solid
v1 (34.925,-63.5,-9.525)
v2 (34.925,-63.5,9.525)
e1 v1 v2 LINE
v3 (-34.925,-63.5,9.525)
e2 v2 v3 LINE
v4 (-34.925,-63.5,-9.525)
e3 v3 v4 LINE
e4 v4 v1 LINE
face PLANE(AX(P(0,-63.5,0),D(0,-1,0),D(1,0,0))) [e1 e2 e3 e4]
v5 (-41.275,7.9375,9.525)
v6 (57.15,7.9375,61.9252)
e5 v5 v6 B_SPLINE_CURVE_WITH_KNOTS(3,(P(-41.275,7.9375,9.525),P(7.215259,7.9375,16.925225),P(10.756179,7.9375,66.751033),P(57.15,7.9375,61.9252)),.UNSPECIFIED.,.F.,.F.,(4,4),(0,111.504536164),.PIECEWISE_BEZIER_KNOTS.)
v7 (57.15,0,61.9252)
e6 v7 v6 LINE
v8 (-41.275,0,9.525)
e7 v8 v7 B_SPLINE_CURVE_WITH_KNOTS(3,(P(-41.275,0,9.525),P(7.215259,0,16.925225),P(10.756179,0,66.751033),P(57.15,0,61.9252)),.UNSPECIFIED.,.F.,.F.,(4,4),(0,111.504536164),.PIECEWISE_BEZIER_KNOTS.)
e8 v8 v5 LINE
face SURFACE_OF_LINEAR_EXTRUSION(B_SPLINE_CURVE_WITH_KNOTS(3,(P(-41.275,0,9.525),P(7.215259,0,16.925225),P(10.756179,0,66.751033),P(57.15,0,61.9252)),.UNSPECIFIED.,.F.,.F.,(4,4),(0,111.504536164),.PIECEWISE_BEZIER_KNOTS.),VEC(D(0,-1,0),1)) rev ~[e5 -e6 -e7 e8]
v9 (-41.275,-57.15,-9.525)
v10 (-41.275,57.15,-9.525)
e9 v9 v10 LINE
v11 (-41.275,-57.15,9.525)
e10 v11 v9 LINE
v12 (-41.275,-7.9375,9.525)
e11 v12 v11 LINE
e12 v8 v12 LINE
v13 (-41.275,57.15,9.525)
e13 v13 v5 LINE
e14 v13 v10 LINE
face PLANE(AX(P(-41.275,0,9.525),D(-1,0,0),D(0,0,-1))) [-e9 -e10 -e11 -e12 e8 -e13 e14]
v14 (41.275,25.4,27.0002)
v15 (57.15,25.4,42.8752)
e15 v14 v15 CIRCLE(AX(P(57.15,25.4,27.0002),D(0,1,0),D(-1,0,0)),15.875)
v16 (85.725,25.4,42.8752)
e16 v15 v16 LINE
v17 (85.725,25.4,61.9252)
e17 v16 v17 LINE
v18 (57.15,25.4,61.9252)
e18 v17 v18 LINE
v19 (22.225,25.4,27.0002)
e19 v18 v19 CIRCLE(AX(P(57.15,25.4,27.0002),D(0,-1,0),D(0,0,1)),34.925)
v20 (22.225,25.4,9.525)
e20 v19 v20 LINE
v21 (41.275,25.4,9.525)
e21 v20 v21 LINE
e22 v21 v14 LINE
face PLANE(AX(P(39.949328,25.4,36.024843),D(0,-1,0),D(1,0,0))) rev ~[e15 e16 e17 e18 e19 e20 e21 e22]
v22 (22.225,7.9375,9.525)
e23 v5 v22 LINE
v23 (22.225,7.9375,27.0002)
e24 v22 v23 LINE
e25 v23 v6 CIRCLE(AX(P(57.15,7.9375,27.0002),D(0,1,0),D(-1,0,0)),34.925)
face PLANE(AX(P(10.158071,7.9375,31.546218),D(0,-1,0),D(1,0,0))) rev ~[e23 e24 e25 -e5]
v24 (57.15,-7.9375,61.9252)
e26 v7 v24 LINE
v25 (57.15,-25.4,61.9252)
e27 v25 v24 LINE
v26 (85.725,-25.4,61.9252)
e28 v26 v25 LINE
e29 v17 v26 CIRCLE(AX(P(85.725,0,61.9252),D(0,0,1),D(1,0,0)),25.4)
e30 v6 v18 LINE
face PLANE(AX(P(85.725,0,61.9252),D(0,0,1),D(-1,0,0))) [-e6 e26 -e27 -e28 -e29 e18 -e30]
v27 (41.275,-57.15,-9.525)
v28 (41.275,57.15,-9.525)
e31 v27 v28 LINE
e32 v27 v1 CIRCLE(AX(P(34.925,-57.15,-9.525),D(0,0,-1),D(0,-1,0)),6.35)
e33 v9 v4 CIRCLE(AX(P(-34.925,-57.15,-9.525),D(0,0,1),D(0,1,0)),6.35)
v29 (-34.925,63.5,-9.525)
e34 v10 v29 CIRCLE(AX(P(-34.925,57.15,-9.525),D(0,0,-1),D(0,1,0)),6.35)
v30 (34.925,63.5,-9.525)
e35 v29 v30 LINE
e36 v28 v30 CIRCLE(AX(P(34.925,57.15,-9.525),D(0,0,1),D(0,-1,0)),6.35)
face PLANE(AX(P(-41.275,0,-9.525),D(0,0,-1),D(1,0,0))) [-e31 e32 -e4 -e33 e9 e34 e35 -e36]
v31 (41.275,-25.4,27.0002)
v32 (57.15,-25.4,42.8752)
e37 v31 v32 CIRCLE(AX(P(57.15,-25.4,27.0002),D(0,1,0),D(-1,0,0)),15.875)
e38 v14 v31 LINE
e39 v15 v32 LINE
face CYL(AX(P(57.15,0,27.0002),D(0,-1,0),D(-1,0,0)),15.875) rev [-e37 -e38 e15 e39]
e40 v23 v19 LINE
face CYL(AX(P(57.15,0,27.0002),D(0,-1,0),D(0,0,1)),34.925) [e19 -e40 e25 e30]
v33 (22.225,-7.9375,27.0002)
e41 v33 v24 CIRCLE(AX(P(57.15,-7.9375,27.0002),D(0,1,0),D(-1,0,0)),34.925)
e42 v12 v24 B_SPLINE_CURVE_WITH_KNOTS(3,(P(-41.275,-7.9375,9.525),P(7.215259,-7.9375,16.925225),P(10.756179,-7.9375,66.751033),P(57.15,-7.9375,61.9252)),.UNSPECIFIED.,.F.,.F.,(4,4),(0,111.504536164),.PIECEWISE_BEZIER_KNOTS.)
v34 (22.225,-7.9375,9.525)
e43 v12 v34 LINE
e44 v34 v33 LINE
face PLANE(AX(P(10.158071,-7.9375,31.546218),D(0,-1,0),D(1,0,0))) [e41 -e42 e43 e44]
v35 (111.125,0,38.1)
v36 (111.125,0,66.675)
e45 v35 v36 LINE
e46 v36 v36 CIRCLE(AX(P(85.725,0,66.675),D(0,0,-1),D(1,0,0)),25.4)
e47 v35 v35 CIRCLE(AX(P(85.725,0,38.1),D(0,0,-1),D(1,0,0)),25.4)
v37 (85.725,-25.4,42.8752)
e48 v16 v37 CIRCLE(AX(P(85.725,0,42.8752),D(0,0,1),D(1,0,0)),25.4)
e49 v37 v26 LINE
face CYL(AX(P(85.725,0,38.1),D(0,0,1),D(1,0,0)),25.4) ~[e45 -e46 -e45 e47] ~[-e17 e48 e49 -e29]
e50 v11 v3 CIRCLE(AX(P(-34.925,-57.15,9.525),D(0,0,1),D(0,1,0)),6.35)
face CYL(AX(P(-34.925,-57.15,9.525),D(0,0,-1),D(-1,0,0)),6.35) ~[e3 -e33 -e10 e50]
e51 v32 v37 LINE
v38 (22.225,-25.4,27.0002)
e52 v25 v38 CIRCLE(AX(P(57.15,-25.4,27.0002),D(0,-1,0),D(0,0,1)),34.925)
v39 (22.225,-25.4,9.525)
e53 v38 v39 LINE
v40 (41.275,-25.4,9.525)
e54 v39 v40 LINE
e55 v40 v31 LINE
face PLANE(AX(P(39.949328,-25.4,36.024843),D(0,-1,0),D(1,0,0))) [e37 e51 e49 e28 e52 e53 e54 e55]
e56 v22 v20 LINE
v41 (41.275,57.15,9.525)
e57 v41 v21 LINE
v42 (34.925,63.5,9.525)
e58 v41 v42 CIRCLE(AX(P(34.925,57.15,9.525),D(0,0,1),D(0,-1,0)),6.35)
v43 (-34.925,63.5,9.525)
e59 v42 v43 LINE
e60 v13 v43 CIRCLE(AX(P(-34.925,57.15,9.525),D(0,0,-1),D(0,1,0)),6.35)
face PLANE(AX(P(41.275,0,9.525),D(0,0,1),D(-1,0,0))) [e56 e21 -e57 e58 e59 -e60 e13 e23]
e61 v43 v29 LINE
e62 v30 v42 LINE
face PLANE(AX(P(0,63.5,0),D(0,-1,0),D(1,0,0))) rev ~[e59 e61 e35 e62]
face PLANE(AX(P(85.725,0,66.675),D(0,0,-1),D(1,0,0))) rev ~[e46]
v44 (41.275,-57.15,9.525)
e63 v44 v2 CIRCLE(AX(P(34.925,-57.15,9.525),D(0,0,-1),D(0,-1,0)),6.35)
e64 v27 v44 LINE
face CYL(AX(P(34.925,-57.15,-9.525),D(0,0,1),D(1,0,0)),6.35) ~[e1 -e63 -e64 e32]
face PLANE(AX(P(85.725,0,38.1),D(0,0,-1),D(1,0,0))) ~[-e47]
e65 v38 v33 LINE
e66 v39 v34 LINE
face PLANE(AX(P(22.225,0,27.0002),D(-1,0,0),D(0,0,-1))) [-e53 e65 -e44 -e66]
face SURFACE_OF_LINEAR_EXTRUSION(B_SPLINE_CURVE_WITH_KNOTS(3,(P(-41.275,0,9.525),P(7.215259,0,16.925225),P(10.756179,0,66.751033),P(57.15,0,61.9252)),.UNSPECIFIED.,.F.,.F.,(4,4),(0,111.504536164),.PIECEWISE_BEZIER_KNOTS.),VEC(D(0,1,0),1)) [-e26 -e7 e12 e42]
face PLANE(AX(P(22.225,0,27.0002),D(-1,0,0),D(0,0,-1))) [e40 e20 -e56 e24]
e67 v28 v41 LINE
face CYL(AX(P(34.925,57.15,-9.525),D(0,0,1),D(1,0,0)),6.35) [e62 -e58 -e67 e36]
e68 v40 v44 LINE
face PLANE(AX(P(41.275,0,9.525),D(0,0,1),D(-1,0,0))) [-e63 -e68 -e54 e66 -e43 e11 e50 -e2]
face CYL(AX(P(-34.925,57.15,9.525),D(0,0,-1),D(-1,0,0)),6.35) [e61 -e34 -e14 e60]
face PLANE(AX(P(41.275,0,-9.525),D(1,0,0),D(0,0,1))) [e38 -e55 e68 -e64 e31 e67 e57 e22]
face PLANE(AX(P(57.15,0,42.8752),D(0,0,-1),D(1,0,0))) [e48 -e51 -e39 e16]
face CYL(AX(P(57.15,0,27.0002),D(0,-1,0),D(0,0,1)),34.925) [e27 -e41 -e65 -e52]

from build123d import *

# Parameters (mm, degrees)
F1_DEPTH = 63.5
F0_W     = 25.4
F0_H     = 19.05
F2_DEPTH = 25.4
F3_DEPTH = 7.9375
F5_R     = 6.35


# Not quite as in the source:
# - a feature names something its author has since deleted; it is built from what else it names


with BuildPart() as f1:
    # F0 (on Front) → F1 (new body, symmetric)
    with BuildSketch(Plane.XZ):
        Polygon((41.275, -9.525), (41.275, 9.525), (22.225, 9.525), (-41.275, 9.525), (-41.275, -9.525), align=None)
    extrude(amount=F1_DEPTH, both=True)

    # F0 (on Front) → F2 (join, symmetric)
    with BuildSketch(Plane.XZ):
        with BuildLine():
            Line((22.225, 9.525), (41.275, 9.525))
            Line((41.275, 9.525), (41.275, 27.0002))
            ThreePointArc((41.275, 27.0002), (45.9246798487, 38.2255201513), (57.15, 42.8752))
            Line((57.15, 42.8752), (60.325, 42.8752))
            Line((60.325, 42.8752), (60.325, 61.9252))
            Line((60.325, 61.9252), (57.15, 61.9252))
            ThreePointArc((57.15, 61.9252), (32.4542956671, 51.6959043329), (22.225, 27.0002))
            Line((22.225, 27.0002), (22.225, 9.525))
        make_face()
        with Locations((73.025, 52.4002)):
            Rectangle(F0_W, F0_H)
    extrude(amount=F2_DEPTH, both=True)

    # F0 (on Front) → F3 (join, symmetric)
    with BuildSketch(Plane.XZ):
        with BuildLine():
            Line((-41.275, 9.525), (22.225, 9.525))
            Line((22.225, 9.525), (22.225, 27.0002))
            ThreePointArc((22.225, 27.0002), (32.4542956671, 51.6959043329), (57.15, 61.9252))
            add(Edge.make_bspline(
                [(-41.275, 9.525), (7.2152586654, 16.9252250344), (10.756178759, 66.7510330677), (57.15, 61.9252)],
                knots=[0, 0, 0, 0, 111.5045361635, 111.5045361635, 111.5045361635, 111.5045361635], degree=3))
        make_face()
    extrude(amount=F3_DEPTH, both=True)

    # F0 (on Front) → F4 (revolve)
    with BuildSketch(Plane.XZ):
        Polygon((85.725, 61.9252), (85.725, 42.8752), (85.725, 38.1), (111.125, 38.1), (111.125, 66.675), (85.725, 66.675), align=None)
    revolve(axis=Axis((85.725, 0, 52.3875), (0, 0, -1)))

    # F5
    f5_edges = [f1.edges().sort_by_distance(p)[0] for p in [
        (41.275, -63.5, 0),
        (-41.275, -63.5, 0),
        (41.275, 63.5, 0),
        (-41.275, 63.5, 0),
    ]]
    fillet(f5_edges, radius=F5_R)


solid = f1.part
